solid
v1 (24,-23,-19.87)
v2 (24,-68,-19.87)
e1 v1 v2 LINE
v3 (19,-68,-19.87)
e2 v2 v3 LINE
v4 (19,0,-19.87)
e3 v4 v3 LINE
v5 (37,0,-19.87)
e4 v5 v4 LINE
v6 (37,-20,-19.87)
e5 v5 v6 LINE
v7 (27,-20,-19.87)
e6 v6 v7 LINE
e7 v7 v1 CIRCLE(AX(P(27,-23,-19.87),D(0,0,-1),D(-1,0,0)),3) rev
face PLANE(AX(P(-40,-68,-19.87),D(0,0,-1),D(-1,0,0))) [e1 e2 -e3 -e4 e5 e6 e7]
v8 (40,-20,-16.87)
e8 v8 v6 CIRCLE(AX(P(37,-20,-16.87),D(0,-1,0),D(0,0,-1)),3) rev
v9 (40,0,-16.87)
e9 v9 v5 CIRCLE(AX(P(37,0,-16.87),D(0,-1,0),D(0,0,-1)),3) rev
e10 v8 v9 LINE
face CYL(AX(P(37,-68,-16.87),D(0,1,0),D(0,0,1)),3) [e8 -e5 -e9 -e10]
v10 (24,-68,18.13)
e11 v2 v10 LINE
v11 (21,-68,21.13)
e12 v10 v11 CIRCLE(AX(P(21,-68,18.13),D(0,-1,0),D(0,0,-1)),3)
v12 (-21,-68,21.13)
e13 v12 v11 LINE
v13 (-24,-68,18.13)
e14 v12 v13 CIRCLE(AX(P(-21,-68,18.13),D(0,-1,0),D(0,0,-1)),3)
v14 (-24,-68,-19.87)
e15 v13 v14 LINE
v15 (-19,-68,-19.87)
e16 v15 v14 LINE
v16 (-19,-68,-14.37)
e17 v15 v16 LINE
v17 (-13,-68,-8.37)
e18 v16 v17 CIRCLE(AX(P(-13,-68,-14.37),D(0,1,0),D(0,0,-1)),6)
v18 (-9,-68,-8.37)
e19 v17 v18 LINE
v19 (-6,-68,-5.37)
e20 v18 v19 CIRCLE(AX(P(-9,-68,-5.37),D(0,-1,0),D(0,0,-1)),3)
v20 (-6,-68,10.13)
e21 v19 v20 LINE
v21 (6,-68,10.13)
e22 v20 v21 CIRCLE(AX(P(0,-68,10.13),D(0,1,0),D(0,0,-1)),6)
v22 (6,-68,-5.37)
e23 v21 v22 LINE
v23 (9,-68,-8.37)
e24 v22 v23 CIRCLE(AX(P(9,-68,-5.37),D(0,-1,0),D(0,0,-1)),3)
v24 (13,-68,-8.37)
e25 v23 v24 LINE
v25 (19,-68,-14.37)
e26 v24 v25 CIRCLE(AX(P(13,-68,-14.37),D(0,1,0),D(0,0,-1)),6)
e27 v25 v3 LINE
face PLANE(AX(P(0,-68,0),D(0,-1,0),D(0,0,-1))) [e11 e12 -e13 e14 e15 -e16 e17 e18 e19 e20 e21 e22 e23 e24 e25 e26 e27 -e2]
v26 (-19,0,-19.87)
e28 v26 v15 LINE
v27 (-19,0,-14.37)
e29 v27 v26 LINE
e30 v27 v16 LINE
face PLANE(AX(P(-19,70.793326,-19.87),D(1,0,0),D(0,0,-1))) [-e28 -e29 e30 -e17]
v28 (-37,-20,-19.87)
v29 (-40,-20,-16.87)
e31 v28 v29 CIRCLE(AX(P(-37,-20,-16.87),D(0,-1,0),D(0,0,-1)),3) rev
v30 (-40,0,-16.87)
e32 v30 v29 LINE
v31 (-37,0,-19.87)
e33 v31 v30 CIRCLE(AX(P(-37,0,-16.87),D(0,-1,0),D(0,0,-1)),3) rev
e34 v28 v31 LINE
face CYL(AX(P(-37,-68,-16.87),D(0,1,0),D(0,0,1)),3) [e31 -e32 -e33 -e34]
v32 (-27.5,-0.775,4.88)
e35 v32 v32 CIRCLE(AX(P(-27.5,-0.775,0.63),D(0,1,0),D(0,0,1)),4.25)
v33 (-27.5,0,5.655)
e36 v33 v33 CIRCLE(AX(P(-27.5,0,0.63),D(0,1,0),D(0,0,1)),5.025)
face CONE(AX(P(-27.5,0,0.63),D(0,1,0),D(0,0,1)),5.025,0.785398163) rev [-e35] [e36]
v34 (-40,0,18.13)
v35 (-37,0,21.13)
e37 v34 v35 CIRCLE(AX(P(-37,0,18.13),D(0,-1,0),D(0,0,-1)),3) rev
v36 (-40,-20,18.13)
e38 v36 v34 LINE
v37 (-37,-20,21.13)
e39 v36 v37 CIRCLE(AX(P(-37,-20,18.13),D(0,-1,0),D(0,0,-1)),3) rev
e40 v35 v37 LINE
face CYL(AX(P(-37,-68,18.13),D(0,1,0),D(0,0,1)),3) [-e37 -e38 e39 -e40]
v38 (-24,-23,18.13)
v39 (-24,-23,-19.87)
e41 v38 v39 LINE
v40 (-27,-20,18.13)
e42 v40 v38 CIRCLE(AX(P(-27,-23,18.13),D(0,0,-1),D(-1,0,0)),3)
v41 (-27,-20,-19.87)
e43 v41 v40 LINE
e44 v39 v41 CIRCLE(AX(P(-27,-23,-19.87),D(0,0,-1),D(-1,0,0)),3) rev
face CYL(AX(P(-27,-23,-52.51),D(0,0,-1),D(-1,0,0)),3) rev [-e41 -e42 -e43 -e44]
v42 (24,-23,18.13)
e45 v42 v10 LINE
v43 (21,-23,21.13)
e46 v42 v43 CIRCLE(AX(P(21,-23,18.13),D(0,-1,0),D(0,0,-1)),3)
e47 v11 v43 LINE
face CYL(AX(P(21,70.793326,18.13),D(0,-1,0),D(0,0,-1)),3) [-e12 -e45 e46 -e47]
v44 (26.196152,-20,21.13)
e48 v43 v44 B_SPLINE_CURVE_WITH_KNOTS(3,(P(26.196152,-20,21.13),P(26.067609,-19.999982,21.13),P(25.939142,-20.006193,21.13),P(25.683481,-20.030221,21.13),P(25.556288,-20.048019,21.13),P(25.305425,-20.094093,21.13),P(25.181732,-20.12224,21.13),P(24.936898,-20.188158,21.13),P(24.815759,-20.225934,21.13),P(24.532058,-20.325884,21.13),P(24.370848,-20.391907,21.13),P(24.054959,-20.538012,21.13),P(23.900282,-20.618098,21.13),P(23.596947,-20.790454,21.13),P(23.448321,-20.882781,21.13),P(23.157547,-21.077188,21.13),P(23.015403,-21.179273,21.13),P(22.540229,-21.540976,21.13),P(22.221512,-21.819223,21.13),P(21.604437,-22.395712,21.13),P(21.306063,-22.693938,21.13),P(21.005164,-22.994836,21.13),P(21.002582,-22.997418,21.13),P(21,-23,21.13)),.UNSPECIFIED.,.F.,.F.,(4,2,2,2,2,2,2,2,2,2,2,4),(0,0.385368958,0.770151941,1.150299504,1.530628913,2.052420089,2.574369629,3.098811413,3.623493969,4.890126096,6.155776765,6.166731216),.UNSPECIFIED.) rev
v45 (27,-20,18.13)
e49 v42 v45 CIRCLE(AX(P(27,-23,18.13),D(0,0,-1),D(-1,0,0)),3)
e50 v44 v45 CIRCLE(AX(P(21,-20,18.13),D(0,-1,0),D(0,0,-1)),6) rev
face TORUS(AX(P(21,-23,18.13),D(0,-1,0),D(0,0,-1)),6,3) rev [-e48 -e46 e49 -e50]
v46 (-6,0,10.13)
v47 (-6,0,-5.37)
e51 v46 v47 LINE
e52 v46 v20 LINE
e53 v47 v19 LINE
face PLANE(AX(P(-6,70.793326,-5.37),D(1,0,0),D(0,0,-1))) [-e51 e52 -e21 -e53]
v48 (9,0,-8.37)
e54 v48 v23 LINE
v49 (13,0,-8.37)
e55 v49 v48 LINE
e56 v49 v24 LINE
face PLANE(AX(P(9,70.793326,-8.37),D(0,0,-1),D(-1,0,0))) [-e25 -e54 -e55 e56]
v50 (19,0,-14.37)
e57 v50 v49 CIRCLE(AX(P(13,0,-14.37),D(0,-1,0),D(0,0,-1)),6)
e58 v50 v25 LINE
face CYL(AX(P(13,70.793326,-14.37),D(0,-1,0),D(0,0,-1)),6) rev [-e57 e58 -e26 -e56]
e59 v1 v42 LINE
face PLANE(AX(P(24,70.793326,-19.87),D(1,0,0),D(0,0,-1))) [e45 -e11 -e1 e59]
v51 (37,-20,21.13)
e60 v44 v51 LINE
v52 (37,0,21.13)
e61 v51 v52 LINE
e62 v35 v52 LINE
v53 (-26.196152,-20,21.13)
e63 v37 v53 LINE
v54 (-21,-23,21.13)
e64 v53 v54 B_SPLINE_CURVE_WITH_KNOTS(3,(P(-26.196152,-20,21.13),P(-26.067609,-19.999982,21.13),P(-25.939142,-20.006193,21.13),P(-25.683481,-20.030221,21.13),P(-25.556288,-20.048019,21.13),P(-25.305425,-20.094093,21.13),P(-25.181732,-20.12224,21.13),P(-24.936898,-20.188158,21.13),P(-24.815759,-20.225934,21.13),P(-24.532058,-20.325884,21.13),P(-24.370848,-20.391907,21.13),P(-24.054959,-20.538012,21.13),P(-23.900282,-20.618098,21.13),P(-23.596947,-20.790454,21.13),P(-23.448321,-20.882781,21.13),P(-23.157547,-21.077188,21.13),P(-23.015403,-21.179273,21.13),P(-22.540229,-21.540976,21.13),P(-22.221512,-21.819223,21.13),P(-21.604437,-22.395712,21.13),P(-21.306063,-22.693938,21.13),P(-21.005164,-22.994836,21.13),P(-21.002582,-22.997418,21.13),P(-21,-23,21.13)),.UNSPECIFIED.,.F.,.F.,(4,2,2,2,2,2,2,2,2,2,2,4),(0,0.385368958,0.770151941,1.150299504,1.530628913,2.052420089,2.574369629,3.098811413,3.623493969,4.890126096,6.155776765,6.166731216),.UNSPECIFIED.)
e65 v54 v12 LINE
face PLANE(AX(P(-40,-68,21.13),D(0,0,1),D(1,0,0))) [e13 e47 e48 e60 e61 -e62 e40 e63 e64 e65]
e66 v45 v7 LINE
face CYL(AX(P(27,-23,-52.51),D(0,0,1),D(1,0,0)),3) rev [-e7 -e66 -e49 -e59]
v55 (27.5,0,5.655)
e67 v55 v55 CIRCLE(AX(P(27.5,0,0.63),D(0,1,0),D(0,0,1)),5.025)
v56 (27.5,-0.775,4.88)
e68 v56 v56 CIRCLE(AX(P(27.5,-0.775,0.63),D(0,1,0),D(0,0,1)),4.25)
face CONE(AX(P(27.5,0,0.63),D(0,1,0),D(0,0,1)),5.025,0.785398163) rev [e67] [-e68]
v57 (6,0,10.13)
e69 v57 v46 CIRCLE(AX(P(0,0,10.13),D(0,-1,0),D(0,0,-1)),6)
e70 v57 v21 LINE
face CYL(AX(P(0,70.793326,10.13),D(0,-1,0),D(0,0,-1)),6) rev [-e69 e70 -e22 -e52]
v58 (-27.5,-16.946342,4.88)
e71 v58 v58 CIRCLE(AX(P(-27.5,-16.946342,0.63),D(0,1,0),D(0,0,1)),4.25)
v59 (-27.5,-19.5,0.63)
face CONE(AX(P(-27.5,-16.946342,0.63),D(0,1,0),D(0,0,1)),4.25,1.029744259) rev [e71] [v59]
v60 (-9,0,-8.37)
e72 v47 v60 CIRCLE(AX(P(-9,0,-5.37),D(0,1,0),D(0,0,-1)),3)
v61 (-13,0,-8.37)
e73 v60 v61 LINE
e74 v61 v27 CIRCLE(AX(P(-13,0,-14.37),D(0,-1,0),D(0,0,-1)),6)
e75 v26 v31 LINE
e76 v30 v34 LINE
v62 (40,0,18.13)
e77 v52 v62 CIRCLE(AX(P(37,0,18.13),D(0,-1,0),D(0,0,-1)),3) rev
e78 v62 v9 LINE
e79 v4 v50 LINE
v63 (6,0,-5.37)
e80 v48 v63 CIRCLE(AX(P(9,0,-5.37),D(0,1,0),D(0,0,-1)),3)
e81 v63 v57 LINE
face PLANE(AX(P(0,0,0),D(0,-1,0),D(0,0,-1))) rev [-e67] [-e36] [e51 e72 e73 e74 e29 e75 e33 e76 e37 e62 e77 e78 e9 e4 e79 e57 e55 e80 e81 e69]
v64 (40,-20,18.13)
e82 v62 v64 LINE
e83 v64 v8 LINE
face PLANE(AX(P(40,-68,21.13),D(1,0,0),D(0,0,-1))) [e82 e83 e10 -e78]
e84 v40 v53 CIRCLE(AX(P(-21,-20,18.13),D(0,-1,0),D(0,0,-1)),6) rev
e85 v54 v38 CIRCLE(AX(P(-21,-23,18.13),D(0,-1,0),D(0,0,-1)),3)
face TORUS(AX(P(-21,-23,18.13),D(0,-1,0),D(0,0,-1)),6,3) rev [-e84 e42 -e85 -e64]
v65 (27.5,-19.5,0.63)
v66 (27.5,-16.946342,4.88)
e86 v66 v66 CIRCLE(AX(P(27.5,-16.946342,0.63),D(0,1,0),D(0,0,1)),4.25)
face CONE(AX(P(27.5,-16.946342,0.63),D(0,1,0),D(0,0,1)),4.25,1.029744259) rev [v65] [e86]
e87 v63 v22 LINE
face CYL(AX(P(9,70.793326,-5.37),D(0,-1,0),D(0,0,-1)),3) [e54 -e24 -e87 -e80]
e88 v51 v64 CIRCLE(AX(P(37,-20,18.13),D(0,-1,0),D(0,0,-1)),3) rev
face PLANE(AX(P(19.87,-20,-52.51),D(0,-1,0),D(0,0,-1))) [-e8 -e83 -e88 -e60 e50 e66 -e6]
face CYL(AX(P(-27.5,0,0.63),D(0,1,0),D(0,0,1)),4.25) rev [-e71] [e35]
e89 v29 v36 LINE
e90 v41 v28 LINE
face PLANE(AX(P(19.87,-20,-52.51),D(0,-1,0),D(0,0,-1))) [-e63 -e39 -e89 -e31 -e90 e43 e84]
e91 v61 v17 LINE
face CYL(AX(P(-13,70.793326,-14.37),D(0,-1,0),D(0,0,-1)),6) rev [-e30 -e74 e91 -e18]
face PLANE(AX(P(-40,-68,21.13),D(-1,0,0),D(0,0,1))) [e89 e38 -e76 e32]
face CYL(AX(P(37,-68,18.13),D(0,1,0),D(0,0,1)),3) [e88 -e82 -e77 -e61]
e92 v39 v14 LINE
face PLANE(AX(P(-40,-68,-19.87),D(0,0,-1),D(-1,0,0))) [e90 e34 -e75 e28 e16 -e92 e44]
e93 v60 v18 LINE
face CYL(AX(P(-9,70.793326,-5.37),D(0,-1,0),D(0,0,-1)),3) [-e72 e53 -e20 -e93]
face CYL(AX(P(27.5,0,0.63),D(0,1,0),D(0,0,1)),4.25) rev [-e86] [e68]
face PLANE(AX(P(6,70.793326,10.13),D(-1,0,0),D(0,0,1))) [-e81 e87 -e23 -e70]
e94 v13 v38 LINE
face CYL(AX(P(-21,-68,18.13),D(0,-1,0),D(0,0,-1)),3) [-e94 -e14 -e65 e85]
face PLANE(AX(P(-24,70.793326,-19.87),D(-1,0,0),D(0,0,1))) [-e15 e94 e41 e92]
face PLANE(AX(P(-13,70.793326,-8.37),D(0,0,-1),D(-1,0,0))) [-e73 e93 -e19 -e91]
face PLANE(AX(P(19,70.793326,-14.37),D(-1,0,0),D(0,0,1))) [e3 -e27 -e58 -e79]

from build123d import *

# Parameters (mm, degrees)
SKETCH2_W                    = 80
SKETCH2_H                    = 41
BOSS_EXTRUDE1_DEPTH          = 68
FILLET1_R                    = 3
SKETCH5_OUTSIDE_W            = 104.544
SKETCH5_OUTSIDE_H            = 65.544
CUT_EXTRUDE2_DEPTH           = 48
CUT_EXTRUDE3_DEPTH           = 82.672987579
FILLET2_R                    = 3
FILLET3_R                    = 3
M10_TAPPED_HOLE1_D           = 8.5
M10_TAPPED_HOLE1_DEPTH       = 16.946342369
M10_TAPPED_HOLE1_CSINK_D     = 10.05
M10_TAPPED_HOLE1_CSINK_ANGLE = 90
M10_TAPPED_HOLE1_TIP         = 2.553657631


with BuildPart() as part:
    # Sketch2 → Boss-Extrude1 (new body)
    with BuildSketch(Plane(origin=(0, 0, 0), x_dir=(1, 0, 0), z_dir=(0, 1, 0))):
        with Locations((0, -0.63)):
            Rectangle(SKETCH2_W, SKETCH2_H)
    extrude(amount=-BOSS_EXTRUDE1_DEPTH)

    # Fillet1
    fillet1_edges = [part.edges().sort_by_distance(p)[0] for p in [
        (40, -34, 21.13),
        (-40, -34, 21.13),
        (-40, -34, -19.87),
        (40, -34, -19.87),
    ]]
    fillet(fillet1_edges, radius=FILLET1_R)

    # Sketch5 outside → Cut-Extrude2 (cut)
    with BuildSketch(Plane.XZ.offset(68)):
        with Locations((0, 0.63)):
            Rectangle(SKETCH5_OUTSIDE_W, SKETCH5_OUTSIDE_H)
        with BuildLine():
            Line((19, -19.87), (24, -19.87))
            Line((24, -19.87), (24, 21.13))
            Line((24, 21.13), (-24, 21.13))
            Line((-24, 21.13), (-24, -19.87))
            Line((-24, -19.87), (-19, -19.87))
            Line((-19, -19.87), (-19, -14.37))
            ThreePointArc((-19, -14.37), (-17.242640687, -10.127359313), (-13, -8.37))
            Line((-13, -8.37), (-9, -8.37))
            ThreePointArc((-9, -8.37), (-6.878679656, -7.491320344), (-6, -5.37))
            Line((-6, -5.37), (-6, 10.13))
            ThreePointArc((-6, 10.13), (0, 16.13), (6, 10.13))
            Line((6, 10.13), (6, -5.37))
            ThreePointArc((6, -5.37), (6.878679656, -7.491320344), (9, -8.37))
            Line((9, -8.37), (13, -8.37))
            ThreePointArc((13, -8.37), (17.242640687, -10.127359313), (19, -14.37))
            Line((19, -14.37), (19, -19.87))
        make_face(mode=Mode.SUBTRACT)
    extrude(amount=-CUT_EXTRUDE2_DEPTH, mode=Mode.SUBTRACT)

    # Sketch6 → Cut-Extrude3 (cut, through all)
    with BuildSketch(Plane.XZ.offset(68)):
        with BuildLine():
            Line((-13, -8.37), (-9, -8.37))
            ThreePointArc((-9, -8.37), (-6.878679656, -7.491320344), (-6, -5.37))
            Line((-6, -5.37), (-6, 10.13))
            ThreePointArc((-6, 10.13), (0, 16.13), (6, 10.13))
            Line((6, 10.13), (6, -5.37))
            ThreePointArc((6, -5.37), (6.878679656, -7.491320344), (9, -8.37))
            Line((9, -8.37), (13, -8.37))
            ThreePointArc((13, -8.37), (17.242640687, -10.127359313), (19, -14.37))
            Line((19, -14.37), (19, -19.87))
            Line((19, -19.87), (-19, -19.87))
            Line((-19, -19.87), (-19, -14.37))
            ThreePointArc((-19, -14.37), (-17.242640687, -10.127359313), (-13, -8.37))
        make_face()
    extrude(amount=-CUT_EXTRUDE3_DEPTH, mode=Mode.SUBTRACT)

    # Fillet2
    fillet2_edges = [part.edges().sort_by_distance(p)[0] for p in [
        (24, -44, 21.13),
        (-24, -44, 21.13),
    ]]
    fillet(fillet2_edges, radius=FILLET2_R)

    # Fillet3
    # the kernel refuses this fillet: 3 mm, written as the material it adds along each edge
    with BuildSketch(Plane(origin=(24, -20, -19.87), x_dir=(0, -1, 0), z_dir=(0, 0, 1)), Plane(origin=(-24, -20, 18.13), x_dir=(0, -1, 0), z_dir=(0, 0, -1))) as fillet3_piece_1:
        with BuildLine():
            CenterArc((FILLET3_R, FILLET3_R), FILLET3_R, 180, 90)
            Line((0, FILLET3_R), (0, 0))
            Line((0, 0), (FILLET3_R, 0))
        make_face()
    extrude(amount=38)
    with BuildSketch(Plane(origin=(-21, -20, 18.13), x_dir=(0.5976672776328279, 0, -0.801744239297648), z_dir=(-0.801744239297648, 0, -0.5976672776328279))) as fillet3_piece_2_section:
        with BuildLine():
            CenterArc((3 + FILLET3_R, FILLET3_R), FILLET3_R, 180, 90)
            Line((3 + FILLET3_R, 0), (3, 0))
            Line((3, 0), (3, FILLET3_R))
        make_face()
    fillet3_piece_2 = revolve(axis=Axis((-21, -20, 18.13), (0, -1, 0)), revolution_arc=233.296989237, mode=Mode.PRIVATE)
    fillet3_piece_2 = split(fillet3_piece_2, bisect_by=Plane(origin=(-23.249816778, -20.934885373, 21.13), z_dir=(0, 0, -1)), keep=Keep.TOP, mode=Mode.PRIVATE)
    add(fillet3_piece_2)
    with BuildSketch(Plane(origin=(21, -20, 18.13), x_dir=(-0.5976672776328279, 0, -0.801744239297648), z_dir=(0.801744239297648, 0, -0.5976672776328279))) as fillet3_piece_3_section:
        with BuildLine():
            CenterArc((3 + FILLET3_R, -FILLET3_R), FILLET3_R, 90, 90)
            Line((3, -FILLET3_R), (3, 0))
            Line((3, 0), (3 + FILLET3_R, 0))
        make_face()
    fillet3_piece_3 = revolve(axis=Axis((21, -20, 18.13), (0, 1, 0)), revolution_arc=233.296989237, mode=Mode.PRIVATE)
    fillet3_piece_3 = split(fillet3_piece_3, bisect_by=Plane(origin=(23.249816872, -20.934884795, 21.13), z_dir=(0, 0, -1)), keep=Keep.TOP, mode=Mode.PRIVATE)
    add(fillet3_piece_3)

    # M10 Tapped Hole1
    with Locations(Plane(origin=(0, 0, 0), x_dir=(1, 0, 0), z_dir=(0, 1, 0))):
        with Locations((27.5, -0.63), (-27.5, -0.63)):
            CounterSinkHole(M10_TAPPED_HOLE1_D / 2, M10_TAPPED_HOLE1_CSINK_D / 2, depth=M10_TAPPED_HOLE1_DEPTH, counter_sink_angle=M10_TAPPED_HOLE1_CSINK_ANGLE)
            with Locations((0, 0, -(M10_TAPPED_HOLE1_DEPTH + M10_TAPPED_HOLE1_TIP / 2))):  # 118° drill point
                Cone(0, M10_TAPPED_HOLE1_D / 2, M10_TAPPED_HOLE1_TIP, mode=Mode.SUBTRACT)


solid = part.part
